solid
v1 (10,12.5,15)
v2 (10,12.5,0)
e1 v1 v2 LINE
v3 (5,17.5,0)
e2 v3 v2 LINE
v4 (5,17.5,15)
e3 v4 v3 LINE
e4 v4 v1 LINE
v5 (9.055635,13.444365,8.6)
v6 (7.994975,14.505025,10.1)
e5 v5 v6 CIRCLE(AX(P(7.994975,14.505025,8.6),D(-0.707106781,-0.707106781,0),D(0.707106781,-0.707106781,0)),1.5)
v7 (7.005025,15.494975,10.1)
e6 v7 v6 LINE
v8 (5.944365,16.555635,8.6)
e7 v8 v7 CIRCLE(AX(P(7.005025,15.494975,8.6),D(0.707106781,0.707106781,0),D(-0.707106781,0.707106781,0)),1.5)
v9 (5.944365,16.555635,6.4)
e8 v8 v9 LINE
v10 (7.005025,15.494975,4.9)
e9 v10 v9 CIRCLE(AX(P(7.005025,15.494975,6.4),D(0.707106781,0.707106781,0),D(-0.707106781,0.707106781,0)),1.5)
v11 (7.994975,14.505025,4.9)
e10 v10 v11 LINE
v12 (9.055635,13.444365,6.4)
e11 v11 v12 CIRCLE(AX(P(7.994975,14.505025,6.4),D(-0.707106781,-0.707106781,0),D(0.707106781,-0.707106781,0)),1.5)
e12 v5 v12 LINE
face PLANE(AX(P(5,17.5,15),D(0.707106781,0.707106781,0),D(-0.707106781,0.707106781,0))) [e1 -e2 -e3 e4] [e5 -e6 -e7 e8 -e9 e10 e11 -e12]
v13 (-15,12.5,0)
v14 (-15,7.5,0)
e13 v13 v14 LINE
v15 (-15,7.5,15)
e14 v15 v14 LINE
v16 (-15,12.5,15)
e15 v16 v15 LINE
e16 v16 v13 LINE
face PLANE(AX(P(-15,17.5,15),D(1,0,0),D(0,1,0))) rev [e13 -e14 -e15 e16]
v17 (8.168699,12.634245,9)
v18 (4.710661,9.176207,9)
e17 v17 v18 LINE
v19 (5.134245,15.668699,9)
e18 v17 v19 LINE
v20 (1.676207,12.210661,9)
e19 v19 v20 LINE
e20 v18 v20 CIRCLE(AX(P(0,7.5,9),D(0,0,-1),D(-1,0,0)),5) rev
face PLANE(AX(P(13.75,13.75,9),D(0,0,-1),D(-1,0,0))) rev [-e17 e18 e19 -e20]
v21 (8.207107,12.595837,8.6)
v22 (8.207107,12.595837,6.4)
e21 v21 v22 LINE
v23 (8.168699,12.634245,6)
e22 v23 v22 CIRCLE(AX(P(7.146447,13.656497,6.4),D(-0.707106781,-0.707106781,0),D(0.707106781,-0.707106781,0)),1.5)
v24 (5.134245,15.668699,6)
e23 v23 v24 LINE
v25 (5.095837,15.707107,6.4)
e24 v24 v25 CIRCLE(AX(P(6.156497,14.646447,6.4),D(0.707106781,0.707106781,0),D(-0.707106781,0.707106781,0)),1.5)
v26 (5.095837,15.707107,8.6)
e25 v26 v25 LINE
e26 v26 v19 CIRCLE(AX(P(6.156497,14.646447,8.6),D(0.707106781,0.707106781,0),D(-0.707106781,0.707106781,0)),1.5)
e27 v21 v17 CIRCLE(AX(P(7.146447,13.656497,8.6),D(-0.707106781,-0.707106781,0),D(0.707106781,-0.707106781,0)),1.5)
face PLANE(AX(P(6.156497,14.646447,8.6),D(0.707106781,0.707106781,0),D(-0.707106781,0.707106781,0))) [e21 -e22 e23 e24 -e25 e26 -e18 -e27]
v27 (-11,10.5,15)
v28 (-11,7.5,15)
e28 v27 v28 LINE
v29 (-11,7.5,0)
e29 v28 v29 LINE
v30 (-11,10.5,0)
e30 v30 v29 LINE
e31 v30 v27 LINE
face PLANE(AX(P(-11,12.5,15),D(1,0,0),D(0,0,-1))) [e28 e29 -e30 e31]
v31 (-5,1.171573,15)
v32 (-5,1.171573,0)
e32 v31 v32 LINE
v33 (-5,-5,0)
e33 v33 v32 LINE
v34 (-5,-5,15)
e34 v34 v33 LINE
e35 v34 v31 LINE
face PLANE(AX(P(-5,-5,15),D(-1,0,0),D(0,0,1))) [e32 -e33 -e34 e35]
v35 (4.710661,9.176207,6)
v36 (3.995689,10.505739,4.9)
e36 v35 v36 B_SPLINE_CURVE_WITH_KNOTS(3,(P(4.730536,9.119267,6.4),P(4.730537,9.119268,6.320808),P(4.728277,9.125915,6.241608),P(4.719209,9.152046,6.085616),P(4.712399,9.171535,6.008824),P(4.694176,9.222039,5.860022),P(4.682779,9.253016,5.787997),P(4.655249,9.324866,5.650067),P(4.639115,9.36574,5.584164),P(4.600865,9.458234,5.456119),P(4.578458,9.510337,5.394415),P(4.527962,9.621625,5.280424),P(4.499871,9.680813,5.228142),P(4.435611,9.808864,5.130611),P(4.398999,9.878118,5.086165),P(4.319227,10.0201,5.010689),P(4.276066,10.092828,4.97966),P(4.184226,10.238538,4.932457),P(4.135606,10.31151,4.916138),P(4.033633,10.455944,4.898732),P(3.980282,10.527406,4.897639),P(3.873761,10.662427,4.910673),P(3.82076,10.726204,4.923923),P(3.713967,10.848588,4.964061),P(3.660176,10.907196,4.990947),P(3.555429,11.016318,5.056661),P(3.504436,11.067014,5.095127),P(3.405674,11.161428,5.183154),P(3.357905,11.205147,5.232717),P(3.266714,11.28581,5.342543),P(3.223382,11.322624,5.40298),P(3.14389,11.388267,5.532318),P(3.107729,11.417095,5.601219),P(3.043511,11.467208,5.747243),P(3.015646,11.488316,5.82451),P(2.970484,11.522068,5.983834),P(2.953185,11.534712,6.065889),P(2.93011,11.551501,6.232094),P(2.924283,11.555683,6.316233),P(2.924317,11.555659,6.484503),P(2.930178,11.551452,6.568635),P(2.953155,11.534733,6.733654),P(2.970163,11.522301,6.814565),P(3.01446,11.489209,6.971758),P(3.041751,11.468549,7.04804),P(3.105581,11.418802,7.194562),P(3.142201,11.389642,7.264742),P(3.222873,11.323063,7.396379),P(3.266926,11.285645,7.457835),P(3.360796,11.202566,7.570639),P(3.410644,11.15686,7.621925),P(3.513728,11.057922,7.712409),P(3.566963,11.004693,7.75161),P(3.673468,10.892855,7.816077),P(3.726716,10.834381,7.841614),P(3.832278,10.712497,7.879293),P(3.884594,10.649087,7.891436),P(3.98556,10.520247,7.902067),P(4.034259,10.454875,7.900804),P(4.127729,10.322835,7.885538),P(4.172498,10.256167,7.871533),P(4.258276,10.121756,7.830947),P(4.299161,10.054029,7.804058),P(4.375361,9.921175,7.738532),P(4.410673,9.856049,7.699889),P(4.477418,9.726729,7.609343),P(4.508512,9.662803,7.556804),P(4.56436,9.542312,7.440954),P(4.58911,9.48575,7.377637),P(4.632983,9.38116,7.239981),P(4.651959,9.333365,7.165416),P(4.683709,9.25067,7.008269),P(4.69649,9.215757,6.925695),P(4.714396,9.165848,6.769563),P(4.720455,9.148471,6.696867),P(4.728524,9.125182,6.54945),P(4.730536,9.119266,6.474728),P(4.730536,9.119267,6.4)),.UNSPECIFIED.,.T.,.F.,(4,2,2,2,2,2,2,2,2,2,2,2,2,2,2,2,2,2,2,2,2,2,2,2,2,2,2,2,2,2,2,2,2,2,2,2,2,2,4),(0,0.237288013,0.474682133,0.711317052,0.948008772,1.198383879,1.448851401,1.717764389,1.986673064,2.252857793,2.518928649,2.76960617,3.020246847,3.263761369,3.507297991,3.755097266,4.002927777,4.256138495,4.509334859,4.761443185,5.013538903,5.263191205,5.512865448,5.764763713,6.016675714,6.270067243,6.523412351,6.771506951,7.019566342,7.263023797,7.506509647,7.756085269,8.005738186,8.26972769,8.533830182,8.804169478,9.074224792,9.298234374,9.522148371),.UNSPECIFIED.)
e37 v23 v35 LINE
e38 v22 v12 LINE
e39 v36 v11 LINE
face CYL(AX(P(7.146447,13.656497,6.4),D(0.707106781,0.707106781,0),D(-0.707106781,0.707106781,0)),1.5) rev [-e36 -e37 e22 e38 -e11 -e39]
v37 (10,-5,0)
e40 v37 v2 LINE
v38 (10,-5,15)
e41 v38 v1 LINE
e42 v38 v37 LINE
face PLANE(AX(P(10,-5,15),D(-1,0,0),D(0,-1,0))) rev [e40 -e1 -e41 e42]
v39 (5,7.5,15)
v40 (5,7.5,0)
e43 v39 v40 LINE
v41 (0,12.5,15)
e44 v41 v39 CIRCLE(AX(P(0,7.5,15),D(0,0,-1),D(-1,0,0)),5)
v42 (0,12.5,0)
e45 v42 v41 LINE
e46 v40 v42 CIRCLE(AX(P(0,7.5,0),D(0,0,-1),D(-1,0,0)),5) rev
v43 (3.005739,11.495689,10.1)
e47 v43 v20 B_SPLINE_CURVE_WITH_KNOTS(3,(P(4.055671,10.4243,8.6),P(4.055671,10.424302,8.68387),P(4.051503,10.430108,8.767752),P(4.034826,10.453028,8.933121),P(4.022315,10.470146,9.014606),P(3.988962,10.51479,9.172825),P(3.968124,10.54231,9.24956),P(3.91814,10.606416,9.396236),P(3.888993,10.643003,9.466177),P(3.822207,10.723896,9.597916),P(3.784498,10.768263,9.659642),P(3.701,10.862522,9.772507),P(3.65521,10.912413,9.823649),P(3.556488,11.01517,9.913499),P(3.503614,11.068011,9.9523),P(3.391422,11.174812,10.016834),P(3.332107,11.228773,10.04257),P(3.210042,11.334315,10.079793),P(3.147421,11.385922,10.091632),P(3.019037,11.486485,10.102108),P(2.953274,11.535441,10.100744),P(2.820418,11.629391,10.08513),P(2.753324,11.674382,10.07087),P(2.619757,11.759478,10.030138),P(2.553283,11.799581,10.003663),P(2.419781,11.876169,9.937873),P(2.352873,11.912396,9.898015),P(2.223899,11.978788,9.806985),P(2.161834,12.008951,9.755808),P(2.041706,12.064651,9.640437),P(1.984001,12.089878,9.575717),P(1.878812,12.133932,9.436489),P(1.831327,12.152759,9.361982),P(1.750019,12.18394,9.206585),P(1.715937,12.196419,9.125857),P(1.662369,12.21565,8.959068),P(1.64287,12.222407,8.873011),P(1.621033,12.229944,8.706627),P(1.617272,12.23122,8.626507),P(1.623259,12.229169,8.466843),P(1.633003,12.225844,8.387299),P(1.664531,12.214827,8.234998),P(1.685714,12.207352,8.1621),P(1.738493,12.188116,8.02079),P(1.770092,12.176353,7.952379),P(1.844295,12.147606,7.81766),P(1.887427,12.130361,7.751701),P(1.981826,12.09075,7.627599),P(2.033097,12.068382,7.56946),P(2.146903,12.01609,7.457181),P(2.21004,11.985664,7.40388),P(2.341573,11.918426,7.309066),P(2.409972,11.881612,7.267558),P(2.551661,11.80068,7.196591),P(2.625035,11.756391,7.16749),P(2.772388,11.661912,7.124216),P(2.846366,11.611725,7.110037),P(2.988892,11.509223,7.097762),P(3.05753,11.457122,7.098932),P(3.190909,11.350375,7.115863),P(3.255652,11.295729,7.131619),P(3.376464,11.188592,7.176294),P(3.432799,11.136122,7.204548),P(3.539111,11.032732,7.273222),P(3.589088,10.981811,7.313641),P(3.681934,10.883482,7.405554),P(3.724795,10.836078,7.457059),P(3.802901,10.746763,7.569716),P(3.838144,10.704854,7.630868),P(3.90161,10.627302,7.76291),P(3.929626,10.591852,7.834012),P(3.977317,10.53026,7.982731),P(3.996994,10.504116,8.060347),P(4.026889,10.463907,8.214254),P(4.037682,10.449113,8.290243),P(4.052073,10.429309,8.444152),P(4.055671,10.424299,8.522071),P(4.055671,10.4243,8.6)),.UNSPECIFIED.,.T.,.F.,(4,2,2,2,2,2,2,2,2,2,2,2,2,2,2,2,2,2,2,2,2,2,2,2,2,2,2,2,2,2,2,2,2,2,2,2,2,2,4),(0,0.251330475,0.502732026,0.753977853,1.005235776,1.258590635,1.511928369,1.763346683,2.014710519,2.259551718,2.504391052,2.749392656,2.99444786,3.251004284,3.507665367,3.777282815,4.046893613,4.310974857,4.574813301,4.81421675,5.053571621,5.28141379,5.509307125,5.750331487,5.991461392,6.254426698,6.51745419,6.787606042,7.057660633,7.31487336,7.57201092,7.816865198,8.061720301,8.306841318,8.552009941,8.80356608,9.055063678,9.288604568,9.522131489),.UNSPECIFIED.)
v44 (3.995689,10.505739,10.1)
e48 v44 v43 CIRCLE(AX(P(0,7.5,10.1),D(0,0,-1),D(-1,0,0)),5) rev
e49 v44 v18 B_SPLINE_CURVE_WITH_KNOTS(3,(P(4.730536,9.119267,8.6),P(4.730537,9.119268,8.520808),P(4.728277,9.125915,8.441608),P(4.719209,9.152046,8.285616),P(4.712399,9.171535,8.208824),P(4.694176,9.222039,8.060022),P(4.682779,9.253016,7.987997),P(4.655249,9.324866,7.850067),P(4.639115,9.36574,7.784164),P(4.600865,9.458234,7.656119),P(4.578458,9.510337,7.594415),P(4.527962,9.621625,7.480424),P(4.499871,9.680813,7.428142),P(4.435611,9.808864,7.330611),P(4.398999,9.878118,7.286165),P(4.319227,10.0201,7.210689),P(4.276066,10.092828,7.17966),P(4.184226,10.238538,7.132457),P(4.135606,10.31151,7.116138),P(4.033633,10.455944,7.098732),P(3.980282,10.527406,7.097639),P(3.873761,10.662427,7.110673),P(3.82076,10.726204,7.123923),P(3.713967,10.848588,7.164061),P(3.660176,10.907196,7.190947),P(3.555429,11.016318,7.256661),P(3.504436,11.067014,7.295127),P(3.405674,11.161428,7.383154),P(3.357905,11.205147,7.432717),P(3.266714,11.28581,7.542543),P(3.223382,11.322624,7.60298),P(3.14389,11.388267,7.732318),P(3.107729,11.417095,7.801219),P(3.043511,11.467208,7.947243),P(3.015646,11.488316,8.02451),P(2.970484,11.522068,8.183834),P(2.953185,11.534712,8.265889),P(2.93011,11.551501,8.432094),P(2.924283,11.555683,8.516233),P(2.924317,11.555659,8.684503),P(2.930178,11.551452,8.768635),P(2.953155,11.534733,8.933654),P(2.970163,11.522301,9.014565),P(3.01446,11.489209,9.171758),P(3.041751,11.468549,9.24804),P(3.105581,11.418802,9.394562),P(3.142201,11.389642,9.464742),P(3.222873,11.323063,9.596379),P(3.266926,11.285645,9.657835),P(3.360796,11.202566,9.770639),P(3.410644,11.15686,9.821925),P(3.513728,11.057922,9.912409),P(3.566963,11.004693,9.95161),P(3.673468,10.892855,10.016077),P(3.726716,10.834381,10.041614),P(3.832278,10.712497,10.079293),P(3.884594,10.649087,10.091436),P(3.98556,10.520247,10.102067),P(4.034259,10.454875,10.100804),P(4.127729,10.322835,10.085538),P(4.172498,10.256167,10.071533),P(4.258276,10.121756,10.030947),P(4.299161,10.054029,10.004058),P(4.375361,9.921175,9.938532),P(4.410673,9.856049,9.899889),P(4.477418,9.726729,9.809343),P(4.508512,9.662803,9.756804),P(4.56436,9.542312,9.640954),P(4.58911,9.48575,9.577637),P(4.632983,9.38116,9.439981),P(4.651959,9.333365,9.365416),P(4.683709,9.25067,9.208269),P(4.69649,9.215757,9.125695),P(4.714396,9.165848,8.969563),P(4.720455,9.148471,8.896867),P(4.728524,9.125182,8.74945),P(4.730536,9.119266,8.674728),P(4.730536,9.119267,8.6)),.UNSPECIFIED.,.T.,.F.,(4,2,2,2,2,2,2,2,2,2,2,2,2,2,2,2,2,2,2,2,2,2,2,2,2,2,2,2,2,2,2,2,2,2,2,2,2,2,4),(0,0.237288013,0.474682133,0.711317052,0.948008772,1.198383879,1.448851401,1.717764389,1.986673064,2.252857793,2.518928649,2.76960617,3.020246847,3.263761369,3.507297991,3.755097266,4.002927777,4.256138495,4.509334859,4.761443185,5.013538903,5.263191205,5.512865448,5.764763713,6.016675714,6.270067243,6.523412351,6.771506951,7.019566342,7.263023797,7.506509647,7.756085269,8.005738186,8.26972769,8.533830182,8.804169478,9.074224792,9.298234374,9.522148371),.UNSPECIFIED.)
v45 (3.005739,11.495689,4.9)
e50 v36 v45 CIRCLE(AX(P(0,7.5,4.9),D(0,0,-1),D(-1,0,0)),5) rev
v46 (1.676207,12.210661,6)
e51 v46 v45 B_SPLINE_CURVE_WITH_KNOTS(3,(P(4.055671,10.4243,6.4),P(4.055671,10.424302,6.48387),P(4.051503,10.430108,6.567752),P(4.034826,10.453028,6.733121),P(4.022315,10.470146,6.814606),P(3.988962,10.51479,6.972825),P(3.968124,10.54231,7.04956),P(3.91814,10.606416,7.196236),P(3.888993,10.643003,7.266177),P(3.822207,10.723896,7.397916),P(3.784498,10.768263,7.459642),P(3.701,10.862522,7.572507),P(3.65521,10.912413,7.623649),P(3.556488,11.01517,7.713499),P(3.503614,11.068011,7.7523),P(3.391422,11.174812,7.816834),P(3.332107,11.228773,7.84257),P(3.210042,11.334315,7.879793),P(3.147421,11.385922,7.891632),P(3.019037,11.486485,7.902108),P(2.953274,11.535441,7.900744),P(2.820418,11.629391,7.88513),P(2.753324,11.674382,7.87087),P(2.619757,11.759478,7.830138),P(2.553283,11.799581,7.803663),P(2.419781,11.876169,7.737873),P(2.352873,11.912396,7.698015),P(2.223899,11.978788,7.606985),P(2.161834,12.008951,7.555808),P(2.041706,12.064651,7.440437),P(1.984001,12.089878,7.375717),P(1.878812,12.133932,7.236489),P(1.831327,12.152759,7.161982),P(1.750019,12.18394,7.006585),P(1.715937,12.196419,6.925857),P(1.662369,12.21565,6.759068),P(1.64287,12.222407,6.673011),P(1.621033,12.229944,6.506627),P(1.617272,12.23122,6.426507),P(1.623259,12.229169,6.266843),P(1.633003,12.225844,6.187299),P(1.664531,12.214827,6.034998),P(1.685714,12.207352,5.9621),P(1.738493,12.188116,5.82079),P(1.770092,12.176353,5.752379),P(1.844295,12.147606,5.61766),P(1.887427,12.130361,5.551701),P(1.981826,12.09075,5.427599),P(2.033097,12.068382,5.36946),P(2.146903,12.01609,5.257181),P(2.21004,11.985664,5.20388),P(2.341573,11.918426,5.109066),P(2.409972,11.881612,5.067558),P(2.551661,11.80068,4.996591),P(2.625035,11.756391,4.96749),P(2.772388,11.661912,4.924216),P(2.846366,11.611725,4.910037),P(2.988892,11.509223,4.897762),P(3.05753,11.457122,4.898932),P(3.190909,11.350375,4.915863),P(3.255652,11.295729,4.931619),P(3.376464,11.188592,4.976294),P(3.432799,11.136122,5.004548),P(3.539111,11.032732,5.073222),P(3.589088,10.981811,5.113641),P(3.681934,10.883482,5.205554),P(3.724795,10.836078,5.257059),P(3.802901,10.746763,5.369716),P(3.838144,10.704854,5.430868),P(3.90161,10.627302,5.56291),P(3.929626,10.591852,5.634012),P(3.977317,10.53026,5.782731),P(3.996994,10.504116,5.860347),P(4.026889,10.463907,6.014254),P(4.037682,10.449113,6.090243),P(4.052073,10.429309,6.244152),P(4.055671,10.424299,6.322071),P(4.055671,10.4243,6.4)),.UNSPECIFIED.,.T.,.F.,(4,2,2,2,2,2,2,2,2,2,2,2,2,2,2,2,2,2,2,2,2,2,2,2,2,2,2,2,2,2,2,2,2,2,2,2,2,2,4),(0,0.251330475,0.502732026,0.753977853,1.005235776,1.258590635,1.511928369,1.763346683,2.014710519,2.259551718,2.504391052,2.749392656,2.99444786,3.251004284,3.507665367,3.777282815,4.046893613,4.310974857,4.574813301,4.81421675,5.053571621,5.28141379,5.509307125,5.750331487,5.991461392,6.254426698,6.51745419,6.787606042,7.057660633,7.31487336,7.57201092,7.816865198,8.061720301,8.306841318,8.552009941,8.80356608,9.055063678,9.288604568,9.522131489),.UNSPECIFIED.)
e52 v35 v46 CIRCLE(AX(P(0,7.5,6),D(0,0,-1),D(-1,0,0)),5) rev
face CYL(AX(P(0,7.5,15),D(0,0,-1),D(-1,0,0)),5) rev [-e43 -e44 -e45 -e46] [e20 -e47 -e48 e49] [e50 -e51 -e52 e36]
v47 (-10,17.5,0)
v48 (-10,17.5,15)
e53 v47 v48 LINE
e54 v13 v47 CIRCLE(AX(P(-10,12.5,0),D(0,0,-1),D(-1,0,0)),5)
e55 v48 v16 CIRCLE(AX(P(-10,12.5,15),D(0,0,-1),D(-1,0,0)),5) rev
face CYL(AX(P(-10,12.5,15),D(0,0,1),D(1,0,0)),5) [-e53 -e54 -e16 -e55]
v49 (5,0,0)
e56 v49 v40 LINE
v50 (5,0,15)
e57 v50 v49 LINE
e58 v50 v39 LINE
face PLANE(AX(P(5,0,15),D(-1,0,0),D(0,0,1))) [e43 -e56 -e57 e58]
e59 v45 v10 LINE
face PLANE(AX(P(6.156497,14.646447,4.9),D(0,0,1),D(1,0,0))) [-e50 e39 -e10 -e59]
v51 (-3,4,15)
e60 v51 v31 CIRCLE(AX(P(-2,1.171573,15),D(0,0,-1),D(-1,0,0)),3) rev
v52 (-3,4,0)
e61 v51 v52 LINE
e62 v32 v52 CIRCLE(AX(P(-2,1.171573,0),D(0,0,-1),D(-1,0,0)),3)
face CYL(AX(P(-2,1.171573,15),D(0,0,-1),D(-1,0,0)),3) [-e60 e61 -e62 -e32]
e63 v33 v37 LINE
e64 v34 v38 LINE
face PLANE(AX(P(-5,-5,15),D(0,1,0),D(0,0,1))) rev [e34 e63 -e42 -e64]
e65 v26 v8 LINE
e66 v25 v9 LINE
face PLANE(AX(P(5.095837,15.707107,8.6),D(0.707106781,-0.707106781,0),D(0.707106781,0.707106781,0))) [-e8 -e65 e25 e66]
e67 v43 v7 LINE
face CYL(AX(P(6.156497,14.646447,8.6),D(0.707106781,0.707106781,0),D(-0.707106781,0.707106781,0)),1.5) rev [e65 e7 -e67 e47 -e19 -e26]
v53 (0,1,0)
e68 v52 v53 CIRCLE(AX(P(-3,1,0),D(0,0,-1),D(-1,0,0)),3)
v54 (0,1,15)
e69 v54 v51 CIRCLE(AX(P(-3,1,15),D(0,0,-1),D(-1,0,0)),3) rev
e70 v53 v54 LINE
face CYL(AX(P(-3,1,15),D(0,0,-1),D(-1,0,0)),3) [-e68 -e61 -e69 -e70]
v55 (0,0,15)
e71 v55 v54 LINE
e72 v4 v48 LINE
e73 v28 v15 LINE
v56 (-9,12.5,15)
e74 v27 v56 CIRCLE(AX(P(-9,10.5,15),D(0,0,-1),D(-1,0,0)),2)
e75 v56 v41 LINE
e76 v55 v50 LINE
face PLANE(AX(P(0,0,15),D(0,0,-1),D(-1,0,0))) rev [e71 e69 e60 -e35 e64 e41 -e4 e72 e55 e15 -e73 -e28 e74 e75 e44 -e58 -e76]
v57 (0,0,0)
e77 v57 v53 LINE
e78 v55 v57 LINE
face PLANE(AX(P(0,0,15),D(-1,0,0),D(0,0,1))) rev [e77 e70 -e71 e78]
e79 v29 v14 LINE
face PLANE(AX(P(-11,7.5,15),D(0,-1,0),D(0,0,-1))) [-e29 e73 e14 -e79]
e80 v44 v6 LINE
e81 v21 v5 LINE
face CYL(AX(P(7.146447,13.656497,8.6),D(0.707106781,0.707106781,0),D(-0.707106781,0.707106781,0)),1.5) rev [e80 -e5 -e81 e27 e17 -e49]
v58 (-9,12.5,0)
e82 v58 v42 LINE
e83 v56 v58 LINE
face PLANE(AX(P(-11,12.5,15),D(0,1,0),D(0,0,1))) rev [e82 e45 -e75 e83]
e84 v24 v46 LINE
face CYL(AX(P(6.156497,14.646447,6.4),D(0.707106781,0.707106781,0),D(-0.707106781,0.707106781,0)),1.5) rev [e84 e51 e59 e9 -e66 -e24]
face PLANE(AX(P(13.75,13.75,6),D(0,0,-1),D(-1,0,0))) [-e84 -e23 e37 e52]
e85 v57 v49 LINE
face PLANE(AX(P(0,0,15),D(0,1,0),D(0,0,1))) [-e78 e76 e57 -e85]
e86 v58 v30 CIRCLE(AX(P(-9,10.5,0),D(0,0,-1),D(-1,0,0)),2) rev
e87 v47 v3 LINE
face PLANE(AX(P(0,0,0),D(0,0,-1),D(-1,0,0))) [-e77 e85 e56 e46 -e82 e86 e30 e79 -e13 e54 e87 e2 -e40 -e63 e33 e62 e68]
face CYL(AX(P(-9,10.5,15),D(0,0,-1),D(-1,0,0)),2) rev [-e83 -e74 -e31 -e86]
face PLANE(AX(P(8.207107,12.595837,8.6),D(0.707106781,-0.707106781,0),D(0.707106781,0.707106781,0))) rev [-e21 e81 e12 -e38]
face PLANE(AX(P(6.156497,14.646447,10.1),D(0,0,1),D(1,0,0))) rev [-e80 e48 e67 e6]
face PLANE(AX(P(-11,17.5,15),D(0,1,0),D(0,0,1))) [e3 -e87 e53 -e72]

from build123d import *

# Parameters (mm, degrees)
BOSS_EXTRUDE1_DEPTH     = 15
FILLET1_R               = 5
CUT_EXTRUDE3_DEPTH      = 1.2
CUT_EXTRUDE4_DEPTH      = 35.323825544
CUT_EXTRUDE4_DEPTH_BACK = 10
FILLET2_R               = 3
FILLET3_R               = 3
FILLET4_R               = 5
FILLET5_R               = 2


with BuildPart() as part:
    # Sketch1 → Boss-Extrude1 (new body)
    with BuildSketch(Plane.XY):
        Polygon((0, 0), (0, 4), (-5, 4), (-5, -5), (10, -5), (10, 12.5), (5, 17.5), (-11, 17.5), (-15, 17.5), (-15, 7.5), (-11, 7.5), (-11, 12.5), (5, 12.5), (5, 0), align=None)
    extrude(amount=BOSS_EXTRUDE1_DEPTH)

    # Fillet1
    fillet1_edges = [part.edges().sort_by_distance(p)[0] for p in [
        (5, 12.5, 7.5),
    ]]
    fillet(fillet1_edges, radius=FILLET1_R)

    # Sketch2 → Cut-Extrude3 (cut)
    with BuildSketch(Plane(origin=(11.25, 11.25, 0), x_dir=(0, 0, -1), z_dir=(0.7071067811865487, 0.7071067811865465, 0))):
        with BuildLine():
            Line((-8.6, 7.503300859), (-6.4, 7.503300859))
            ThreePointArc((-6.4, 7.503300859), (-5.339339828, 7.063961031), (-4.9, 6.003300859))
            Line((-4.9, 6.003300859), (-4.9, 4.603300859))
            ThreePointArc((-4.9, 4.603300859), (-5.339339828, 3.542640687), (-6.4, 3.103300859))
            Line((-6.4, 3.103300859), (-8.6, 3.103300859))
            ThreePointArc((-8.6, 3.103300859), (-9.660660172, 3.542640687), (-10.1, 4.603300859))
            Line((-10.1, 4.603300859), (-10.1, 6.003300859))
            ThreePointArc((-10.1, 6.003300859), (-9.660660172, 7.063961031), (-8.6, 7.503300859))
        make_face()
    extrude(amount=-CUT_EXTRUDE3_DEPTH, mode=Mode.SUBTRACT)

    # Sketch2<5> → Cut-Extrude4 (cut, two sides: drawn at the far end of the back side and taken through both)
    with BuildSketch(Plane(origin=(11.25, 11.25, 0), x_dir=(0, 0, -1), z_dir=(0.7071067811865487, 0.7071067811865465, 0)).offset(-CUT_EXTRUDE4_DEPTH_BACK)):
        with BuildLine():
            Line((-9, 3.157617629), (-9, 7.448984088))
            ThreePointArc((-9, 7.448984088), (-9.793733639, 6.911595965), (-10.1, 6.003300859))
            Line((-10.1, 6.003300859), (-10.1, 4.603300859))
            ThreePointArc((-10.1, 4.603300859), (-9.793733639, 3.695005753), (-9, 3.157617629))
        make_face()
        with BuildLine():
            ThreePointArc((-4.9, 6.003300859), (-5.206266361, 6.911595965), (-6, 7.448984088))
            Line((-6, 7.448984088), (-6, 3.157617629))
            ThreePointArc((-6, 3.157617629), (-5.206266361, 3.695005753), (-4.9, 4.603300859))
            Line((-4.9, 4.603300859), (-4.9, 6.003300859))
        make_face()
    extrude(amount=CUT_EXTRUDE4_DEPTH + CUT_EXTRUDE4_DEPTH_BACK, mode=Mode.SUBTRACT)

    # Fillet2
    fillet2_edges = [part.edges().sort_by_distance(p)[0] for p in [
        (0, 4, 7.5),
    ]]
    fillet(fillet2_edges, radius=FILLET2_R)

    # Fillet3
    # the kernel refuses this fillet: 3 mm, written as the material it takes off along each edge
    with BuildSketch(Plane(origin=(-5, 4, -7.071067812), x_dir=(1, 0, 0), z_dir=(0, 0, 1))) as fillet3_piece_1:
        with BuildLine():
            CenterArc((3, -2.828427125), FILLET3_R, 109.471220634, 70.528779366)
            Line((0, -2.828427125), (-0.06, -2.828427125))
            Line((-0.06, -2.828427125), (-0.06, 0))
            Line((-0.06, 0), (0, 0.06))
            ThreePointArc((0, 0.06), (1, 0.06), (1.98, 0.056568542))
            Line((1.98, 0.056568542), (2, 0))
        make_face()
    extrude(amount=29.142135624, mode=Mode.SUBTRACT)

    # Fillet4
    fillet4_edges = [part.edges().sort_by_distance(p)[0] for p in [
        (-15, 17.5, 7.5),
    ]]
    fillet(fillet4_edges, radius=FILLET4_R)

    # Fillet5
    fillet5_edges = [part.edges().sort_by_distance(p)[0] for p in [
        (-11, 12.5, 7.5),
    ]]
    fillet(fillet5_edges, radius=FILLET5_R)


solid = part.part
